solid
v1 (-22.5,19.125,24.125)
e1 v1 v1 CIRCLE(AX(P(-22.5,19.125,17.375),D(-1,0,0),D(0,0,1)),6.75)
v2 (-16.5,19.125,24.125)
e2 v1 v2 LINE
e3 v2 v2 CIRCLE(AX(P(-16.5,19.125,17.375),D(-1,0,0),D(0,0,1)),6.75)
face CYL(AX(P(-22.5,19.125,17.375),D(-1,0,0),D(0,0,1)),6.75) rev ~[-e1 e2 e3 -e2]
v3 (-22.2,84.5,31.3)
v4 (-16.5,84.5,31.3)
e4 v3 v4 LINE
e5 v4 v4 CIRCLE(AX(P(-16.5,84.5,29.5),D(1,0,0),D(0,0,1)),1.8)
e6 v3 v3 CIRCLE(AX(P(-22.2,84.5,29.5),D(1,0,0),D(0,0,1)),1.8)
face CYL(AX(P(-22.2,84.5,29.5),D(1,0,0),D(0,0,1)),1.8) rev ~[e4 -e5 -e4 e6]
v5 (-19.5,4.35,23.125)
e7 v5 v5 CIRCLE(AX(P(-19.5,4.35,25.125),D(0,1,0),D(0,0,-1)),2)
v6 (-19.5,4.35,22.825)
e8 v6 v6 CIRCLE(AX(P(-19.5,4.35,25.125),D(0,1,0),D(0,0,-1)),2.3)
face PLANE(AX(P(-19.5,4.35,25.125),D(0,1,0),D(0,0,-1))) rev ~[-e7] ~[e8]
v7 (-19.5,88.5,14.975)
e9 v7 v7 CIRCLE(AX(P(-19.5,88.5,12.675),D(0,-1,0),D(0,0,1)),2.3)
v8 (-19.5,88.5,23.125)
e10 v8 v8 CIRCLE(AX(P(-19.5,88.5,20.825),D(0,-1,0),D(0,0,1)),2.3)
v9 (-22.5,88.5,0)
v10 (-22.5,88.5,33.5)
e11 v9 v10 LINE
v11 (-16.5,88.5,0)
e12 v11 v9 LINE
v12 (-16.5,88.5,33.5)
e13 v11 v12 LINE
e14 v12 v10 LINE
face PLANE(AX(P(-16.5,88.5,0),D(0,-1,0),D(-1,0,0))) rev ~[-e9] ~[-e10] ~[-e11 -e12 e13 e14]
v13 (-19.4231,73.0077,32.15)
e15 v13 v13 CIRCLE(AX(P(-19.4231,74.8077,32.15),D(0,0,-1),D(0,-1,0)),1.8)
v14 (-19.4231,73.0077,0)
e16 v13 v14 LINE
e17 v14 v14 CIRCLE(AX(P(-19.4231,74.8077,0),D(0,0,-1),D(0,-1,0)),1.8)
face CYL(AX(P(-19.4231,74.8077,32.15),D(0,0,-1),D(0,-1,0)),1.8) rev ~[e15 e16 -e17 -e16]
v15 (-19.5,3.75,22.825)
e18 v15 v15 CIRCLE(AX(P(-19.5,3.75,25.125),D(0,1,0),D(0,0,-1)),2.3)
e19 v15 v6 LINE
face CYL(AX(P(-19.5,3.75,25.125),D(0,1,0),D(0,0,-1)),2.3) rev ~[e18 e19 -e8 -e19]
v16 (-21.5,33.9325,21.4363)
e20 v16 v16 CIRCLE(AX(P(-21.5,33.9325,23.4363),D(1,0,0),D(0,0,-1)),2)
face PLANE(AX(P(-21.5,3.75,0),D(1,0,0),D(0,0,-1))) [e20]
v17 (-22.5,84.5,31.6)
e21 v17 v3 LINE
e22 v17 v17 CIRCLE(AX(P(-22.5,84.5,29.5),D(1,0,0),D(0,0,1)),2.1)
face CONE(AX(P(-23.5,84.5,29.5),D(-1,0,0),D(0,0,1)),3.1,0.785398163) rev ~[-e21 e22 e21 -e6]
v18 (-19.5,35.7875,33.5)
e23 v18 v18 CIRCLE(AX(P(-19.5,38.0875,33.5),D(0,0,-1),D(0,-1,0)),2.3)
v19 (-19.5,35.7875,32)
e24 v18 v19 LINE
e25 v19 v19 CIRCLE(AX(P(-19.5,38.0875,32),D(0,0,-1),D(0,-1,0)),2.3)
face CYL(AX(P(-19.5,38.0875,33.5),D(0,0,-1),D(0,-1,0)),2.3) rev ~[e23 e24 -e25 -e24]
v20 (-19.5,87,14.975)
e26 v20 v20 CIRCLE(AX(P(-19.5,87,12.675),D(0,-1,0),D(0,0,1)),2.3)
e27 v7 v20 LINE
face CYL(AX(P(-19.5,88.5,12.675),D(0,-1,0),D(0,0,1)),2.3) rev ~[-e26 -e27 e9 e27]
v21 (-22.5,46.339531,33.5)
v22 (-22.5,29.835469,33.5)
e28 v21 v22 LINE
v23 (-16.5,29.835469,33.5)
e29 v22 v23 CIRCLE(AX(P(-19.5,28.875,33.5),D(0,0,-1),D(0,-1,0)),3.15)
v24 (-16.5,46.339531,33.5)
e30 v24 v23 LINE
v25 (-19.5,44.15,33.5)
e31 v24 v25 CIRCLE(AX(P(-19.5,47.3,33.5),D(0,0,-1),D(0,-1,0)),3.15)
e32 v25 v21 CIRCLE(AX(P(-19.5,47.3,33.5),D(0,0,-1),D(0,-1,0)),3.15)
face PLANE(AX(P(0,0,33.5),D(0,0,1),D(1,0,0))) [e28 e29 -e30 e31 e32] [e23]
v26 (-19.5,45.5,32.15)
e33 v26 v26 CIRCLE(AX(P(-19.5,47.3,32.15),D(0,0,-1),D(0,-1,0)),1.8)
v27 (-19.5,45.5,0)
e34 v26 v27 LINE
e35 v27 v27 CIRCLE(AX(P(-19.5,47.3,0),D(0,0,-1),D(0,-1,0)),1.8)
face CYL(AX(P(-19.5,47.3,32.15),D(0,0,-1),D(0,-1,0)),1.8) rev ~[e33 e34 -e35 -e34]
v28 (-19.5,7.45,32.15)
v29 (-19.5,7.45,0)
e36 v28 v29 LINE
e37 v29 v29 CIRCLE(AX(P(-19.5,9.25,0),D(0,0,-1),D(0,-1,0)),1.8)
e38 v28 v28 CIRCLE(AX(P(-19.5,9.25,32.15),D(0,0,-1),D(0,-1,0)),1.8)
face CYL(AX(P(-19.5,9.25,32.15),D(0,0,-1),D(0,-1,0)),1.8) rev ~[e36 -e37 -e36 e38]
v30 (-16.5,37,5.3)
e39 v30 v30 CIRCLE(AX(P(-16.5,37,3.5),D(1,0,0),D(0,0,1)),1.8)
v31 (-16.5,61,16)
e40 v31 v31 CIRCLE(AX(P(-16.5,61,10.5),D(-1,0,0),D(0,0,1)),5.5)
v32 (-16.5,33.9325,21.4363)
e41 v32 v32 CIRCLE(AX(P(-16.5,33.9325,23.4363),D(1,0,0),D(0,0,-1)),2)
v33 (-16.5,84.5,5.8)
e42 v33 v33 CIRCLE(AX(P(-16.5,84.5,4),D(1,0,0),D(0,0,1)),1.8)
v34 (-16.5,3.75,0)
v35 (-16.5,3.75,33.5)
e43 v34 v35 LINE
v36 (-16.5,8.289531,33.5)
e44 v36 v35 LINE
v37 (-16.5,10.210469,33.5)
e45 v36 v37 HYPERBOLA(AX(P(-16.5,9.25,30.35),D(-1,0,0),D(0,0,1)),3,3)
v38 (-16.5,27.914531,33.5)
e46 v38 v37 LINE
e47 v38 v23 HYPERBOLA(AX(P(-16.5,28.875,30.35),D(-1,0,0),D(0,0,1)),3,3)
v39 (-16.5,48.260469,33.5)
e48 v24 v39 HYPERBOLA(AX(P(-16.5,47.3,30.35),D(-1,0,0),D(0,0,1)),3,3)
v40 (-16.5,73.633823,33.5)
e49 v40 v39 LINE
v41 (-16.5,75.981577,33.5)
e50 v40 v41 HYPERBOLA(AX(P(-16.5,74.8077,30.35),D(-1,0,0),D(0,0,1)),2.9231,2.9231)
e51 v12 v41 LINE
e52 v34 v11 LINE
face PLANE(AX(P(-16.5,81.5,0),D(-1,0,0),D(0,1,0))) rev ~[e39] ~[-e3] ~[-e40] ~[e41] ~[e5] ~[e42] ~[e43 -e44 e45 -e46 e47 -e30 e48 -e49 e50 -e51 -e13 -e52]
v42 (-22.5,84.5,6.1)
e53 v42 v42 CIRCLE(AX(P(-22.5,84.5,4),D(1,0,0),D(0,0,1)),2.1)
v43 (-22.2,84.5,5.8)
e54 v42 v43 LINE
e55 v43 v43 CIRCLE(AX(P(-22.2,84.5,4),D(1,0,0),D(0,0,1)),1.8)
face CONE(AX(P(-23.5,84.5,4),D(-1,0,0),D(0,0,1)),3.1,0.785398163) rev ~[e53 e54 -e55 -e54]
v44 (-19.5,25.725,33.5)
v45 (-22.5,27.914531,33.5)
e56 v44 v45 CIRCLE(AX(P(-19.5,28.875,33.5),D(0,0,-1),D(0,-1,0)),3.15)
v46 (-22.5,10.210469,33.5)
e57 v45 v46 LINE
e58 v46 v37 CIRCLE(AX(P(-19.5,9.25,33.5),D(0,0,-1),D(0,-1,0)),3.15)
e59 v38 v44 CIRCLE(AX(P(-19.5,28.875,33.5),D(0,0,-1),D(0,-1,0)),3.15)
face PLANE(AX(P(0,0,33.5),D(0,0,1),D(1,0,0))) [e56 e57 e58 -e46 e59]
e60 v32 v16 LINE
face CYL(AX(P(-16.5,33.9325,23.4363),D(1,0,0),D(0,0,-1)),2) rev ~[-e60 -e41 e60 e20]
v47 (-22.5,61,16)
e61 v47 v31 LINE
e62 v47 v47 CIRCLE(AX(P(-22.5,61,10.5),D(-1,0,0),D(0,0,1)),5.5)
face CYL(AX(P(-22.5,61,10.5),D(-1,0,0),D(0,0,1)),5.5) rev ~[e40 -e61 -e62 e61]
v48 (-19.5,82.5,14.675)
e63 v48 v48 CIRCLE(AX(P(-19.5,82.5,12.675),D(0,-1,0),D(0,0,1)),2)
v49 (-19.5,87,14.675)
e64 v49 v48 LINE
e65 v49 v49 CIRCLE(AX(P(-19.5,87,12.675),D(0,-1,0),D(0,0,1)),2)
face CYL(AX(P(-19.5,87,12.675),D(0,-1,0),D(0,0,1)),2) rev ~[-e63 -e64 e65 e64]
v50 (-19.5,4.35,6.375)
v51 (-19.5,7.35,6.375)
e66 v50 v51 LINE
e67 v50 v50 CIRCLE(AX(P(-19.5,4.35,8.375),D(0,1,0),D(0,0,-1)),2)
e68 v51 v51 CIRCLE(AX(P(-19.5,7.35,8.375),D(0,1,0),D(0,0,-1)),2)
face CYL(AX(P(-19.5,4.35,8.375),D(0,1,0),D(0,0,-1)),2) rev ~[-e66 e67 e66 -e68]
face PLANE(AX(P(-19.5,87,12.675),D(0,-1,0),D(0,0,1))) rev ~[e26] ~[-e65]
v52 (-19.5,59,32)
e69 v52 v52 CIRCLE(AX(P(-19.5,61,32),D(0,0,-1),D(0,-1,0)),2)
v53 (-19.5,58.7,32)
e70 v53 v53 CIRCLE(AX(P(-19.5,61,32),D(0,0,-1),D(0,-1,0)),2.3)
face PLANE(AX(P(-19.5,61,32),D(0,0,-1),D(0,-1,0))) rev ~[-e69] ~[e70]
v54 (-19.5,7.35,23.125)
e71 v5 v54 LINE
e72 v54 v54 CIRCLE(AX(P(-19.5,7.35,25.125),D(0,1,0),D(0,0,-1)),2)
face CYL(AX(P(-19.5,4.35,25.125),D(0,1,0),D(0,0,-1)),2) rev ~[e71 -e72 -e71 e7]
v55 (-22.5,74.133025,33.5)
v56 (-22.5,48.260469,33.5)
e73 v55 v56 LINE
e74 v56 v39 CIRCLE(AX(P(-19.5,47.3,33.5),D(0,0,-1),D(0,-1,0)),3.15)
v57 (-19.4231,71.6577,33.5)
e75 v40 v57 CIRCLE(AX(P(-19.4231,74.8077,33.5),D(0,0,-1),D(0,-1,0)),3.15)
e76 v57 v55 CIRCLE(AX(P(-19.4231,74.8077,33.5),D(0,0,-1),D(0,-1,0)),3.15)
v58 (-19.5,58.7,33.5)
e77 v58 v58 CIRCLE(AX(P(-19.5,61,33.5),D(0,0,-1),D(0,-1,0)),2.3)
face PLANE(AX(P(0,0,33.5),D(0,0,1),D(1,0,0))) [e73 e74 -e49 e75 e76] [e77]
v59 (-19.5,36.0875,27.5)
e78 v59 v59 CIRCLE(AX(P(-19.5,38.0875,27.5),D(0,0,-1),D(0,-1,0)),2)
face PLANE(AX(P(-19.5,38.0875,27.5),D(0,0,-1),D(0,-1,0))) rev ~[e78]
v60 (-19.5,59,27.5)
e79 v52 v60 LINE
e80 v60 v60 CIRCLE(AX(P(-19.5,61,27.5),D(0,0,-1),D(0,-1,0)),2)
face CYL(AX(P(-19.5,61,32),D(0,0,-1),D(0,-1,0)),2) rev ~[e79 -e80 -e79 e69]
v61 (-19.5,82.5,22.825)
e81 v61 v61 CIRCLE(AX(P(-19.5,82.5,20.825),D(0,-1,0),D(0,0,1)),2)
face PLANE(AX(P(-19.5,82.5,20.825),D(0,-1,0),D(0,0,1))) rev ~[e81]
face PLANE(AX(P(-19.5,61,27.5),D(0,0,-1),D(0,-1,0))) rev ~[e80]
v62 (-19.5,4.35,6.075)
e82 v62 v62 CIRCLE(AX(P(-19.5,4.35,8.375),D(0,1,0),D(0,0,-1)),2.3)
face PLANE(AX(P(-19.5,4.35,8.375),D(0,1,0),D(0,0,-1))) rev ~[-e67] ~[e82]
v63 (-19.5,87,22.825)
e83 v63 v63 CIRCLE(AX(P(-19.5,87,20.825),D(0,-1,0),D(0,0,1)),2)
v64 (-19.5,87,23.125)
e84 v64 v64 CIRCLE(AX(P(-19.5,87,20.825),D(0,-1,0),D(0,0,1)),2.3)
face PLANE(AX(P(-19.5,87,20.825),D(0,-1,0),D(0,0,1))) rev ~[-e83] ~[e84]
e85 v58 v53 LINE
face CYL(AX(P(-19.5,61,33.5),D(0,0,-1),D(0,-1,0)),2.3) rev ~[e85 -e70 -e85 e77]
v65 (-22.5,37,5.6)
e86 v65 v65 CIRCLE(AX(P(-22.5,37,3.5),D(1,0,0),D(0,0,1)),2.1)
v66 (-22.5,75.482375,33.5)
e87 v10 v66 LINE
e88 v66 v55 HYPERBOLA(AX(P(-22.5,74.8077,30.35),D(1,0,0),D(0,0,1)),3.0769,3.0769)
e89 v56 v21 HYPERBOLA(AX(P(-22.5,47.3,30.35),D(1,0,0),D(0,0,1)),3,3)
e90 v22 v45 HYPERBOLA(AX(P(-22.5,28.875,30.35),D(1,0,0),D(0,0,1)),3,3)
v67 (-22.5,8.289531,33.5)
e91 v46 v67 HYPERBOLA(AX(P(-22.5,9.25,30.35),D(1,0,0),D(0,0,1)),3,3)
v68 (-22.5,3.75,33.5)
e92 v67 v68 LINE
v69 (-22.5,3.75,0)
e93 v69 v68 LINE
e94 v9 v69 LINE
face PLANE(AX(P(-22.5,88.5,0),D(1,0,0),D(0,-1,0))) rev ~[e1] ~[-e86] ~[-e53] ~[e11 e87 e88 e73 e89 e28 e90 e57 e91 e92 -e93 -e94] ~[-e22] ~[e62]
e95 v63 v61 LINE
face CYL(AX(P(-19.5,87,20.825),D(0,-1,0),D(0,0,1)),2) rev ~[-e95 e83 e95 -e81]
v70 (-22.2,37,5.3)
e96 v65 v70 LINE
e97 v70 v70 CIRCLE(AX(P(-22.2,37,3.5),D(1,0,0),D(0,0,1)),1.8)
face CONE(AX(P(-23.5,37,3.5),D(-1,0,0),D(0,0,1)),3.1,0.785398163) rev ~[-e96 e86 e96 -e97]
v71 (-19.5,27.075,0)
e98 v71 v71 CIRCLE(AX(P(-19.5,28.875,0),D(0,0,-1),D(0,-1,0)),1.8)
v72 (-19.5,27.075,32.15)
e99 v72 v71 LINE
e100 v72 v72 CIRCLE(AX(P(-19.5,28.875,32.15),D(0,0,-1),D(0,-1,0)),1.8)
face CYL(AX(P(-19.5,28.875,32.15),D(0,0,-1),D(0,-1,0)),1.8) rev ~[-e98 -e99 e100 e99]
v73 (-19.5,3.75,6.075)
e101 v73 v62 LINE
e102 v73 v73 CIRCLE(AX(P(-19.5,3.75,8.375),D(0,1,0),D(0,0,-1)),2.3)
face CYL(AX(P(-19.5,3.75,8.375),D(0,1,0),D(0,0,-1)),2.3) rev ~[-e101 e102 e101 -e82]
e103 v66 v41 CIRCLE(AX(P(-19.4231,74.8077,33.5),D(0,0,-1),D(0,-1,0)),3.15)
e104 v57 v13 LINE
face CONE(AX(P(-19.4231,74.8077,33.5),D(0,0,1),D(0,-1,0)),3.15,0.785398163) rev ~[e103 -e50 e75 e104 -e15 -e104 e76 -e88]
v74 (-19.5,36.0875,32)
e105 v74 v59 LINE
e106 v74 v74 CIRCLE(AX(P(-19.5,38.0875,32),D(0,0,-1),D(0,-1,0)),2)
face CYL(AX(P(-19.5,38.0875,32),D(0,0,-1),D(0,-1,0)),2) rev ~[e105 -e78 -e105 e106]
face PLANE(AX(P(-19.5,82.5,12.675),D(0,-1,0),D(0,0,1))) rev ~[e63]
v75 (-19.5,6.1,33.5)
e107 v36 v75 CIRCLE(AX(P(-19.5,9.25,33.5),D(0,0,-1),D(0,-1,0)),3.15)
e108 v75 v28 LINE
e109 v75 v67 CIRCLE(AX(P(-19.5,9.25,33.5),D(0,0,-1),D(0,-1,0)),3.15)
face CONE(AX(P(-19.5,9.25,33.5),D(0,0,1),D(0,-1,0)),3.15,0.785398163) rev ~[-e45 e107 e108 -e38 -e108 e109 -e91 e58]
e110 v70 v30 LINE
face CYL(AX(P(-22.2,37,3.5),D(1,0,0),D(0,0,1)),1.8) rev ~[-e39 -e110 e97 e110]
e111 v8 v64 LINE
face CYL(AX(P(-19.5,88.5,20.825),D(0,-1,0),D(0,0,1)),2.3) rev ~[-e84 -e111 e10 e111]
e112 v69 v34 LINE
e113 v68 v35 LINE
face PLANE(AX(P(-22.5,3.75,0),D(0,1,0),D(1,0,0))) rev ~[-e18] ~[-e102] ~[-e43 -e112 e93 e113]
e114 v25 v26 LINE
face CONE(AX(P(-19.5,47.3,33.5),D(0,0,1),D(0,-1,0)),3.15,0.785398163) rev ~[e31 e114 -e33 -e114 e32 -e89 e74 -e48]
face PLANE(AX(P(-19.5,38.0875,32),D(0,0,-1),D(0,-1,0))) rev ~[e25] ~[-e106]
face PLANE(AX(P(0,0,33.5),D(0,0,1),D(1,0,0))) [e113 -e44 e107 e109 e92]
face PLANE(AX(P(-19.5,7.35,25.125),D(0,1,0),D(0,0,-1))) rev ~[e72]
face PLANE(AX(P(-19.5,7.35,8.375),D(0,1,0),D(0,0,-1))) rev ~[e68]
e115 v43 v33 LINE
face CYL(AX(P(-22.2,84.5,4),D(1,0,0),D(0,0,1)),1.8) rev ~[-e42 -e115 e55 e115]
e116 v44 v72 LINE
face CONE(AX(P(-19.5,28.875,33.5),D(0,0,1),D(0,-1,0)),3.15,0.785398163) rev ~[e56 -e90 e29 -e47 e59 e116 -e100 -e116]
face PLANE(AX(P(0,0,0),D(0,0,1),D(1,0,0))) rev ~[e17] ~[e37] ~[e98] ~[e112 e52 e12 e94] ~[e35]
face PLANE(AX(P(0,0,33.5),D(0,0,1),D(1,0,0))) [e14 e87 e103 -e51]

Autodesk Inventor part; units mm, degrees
ref_plane "YZ Plane" through (0, 0, 0) normal (1, 0, 0) x (0, 1, 0)
ref_plane "XZ Plane" through (0, 0, 0) normal (0, 1, 0) x (-1, 0, 0)
ref_plane "Work Plane1" through (0, 0, 0) normal (0, 0, 1) x (1, 0, 0)
sketch "Sketch1" plane through (0, 0, 0) normal (0, 0, 1) x (1, 0, 0)
  line L0 (23.5, 88.5) -> (-23.5, 88.5) projected
  line L1 (-23.5, 88.5) -> (-23.5, 36.5) projected
  line L2 (-26.5, 33.5) -> (-89, 33.5) projected
  line L3 (-89, 33.5) -> (-89, -72.5) projected
  line L4 (-89, -72.5) -> (-77, -72.5) projected
  line L5 (-74, -75.5) -> (-74, -93.5) projected
  line L6 (-74, -93.5) -> (74, -93.5) projected
  line L7 (74, -93.5) -> (74, -75.5) projected
  line L8 (77, -72.5) -> (89, -72.5) projected
  line L9 (89, -72.5) -> (89, 33.5) projected
  line L10 (89, 33.5) -> (26.5, 33.5) projected
  line L11 (23.5, 36.5) -> (23.5, 88.5) projected
  line L12 (-4.5, 81.5) -> (-4.5, 36.5) projected
  line L13 (-7.5, 33.5) -> (-13.5, 33.5) projected
  line L14 (-16.5, 36.5) -> (-16.5, 81.5) projected
  line L15 (-13.5, 84.5) -> (-7.5, 84.5) projected
  line L16 (16.5, 81.5) -> (16.5, 36.5) projected
  line L17 (13.5, 33.5) -> (7.5, 33.5) projected
  line L18 (4.5, 36.5) -> (4.5, 81.5) projected
  line L19 (7.5, 84.5) -> (13.5, 84.5) projected
  line L20 (-16.5, 88.5) -> (-22.5, 88.5)
  line L21 (-22.5, 88.5) -> (-22.5, 3.75)
  line L22 (-22.5, 3.75) -> (-16.5, 3.75)
  line L23 (-16.5, 3.75) -> (-16.5, 88.5)
  line L24 (-32.2, 4.75) -> (-59.9, 4.75)
  arc A0 (13.5, 33.5) -> (16.5, 36.5) centre (13.5, 36.5) ccw projected
  arc A1 (4.5, 36.5) -> (7.5, 33.5) centre (7.5, 36.5) ccw projected
  arc A2 (7.5, 84.5) -> (4.5, 81.5) centre (7.5, 81.5) ccw projected
  arc A3 (16.5, 81.5) -> (13.5, 84.5) centre (13.5, 81.5) ccw projected
  arc A4 (-4.5, 81.5) -> (-7.5, 84.5) centre (-7.5, 81.5) ccw projected
  arc A5 (-7.5, 33.5) -> (-4.5, 36.5) centre (-7.5, 36.5) ccw projected
  arc A6 (-16.5, 36.5) -> (-13.5, 33.5) centre (-13.5, 36.5) ccw projected
  arc A7 (-13.5, 84.5) -> (-16.5, 81.5) centre (-13.5, 81.5) ccw projected
  arc A8 (-26.5, 33.5) -> (-23.5, 36.5) centre (-26.5, 36.5) ccw projected
  arc A9 (-74, -75.5) -> (-77, -72.5) centre (-77, -75.5) ccw projected
  arc A10 (77, -72.5) -> (74, -75.5) centre (77, -75.5) ccw projected
  arc A11 (23.5, 36.5) -> (26.5, 33.5) centre (26.5, 36.5) ccw projected
  point P0 (0, 0)
  point P1 (-16.5, 36.5)
  point P2 (-16.5, 81.5)
  dimension "d0" = 1
  dimension "d2" = 1
ref_plane "Work Plane2" through (-89, -40.3889, 33.5) normal (0, 0, 1) x (1, 0, 0)
extrude "Extrusion1" add sketch "Sketch1" along normal up to surface (33.5 mm away) contours L23 L14 L22 L21 L0
sketch "Sketch2" plane through (-22.5, 3.75, 0) normal (-1, 0, 0) x (0, 0, 1)
  arc A0 (15.7043, 9.7757) -> (16.863, 11.545) centre (12.3771, 13.2188) ccw projected
  arc A1 (16.863, 11.545) -> (17.4685, 11.512) centre (17.375, 15.375) ccw projected
  arc A2 (17.4685, 11.512) -> (18.4285, 9.6275) centre (22.1095, 12.6893) ccw projected
  arc A3 (18.4285, 9.6275) -> (19.3146, 9.863) centre (17.375, 15.375) ccw projected
  arc A4 (19.3146, 9.863) -> (19.2121, 11.9755) centre (14.599, 10.6929) ccw projected
  arc A5 (19.2121, 11.9755) -> (19.7212, 12.3047) centre (17.375, 15.375) ccw projected
  arc A6 (19.7212, 12.3047) -> (21.6056, 11.3444) centre (22.7839, 15.9851) ccw projected
  arc A7 (21.6056, 11.3444) -> (22.184, 12.0558) centre (17.375, 15.375) ccw projected
  arc A8 (22.184, 12.0558) -> (20.8594, 13.7045) centre (17.8813, 9.9554) ccw projected
  arc A9 (20.8594, 13.7045) -> (21.0778, 14.2702) centre (17.375, 15.375) ccw projected
  arc A10 (21.0778, 14.2702) -> (23.1668, 14.6008) centre (21.3923, 19.0479) ccw projected
  arc A11 (23.1668, 14.6008) -> (23.2166, 15.5164) centre (17.375, 15.375) ccw projected
  arc A12 (23.2166, 15.5164) -> (21.1758, 16.0716) centre (20.9701, 11.288) ccw projected
  arc A13 (21.1758, 16.0716) -> (21.02, 16.6576) centre (17.375, 15.375) ccw projected
  arc A14 (21.02, 16.6576) -> (22.5157, 18.153) centre (18.4662, 20.7077) ccw projected
  arc A15 (22.5157, 18.153) -> (22.0178, 18.923) centre (17.375, 15.375) ccw projected
  arc A16 (22.0178, 18.923) -> (20.0404, 18.1726) centre (22.6858, 14.1817) ccw projected
  arc A17 (20.0404, 18.1726) -> (19.57, 18.5552) centre (17.375, 15.375) ccw projected
  arc A18 (19.57, 18.5552) -> (19.9011, 20.644) centre (15.1233, 20.3306) ccw projected
  arc A19 (19.9011, 20.644) -> (19.0457, 20.9743) centre (17.375, 15.375) ccw projected
  arc A20 (19.0457, 20.9743) -> (17.887, 19.205) centre (22.3729, 17.5312) ccw projected
  arc A21 (17.887, 19.205) -> (17.2815, 19.238) centre (17.375, 15.375) ccw projected
  arc A22 (17.2815, 19.238) -> (16.3215, 21.1225) centre (12.6405, 18.0607) ccw projected
  arc A23 (16.3215, 21.1225) -> (15.4354, 20.887) centre (17.375, 15.375) ccw projected
  arc A24 (15.4354, 20.887) -> (15.5379, 18.7745) centre (20.151, 20.0571) ccw projected
  arc A25 (15.5379, 18.7745) -> (15.0288, 18.4453) centre (17.375, 15.375) ccw projected
  arc A26 (15.0288, 18.4453) -> (13.1444, 19.4056) centre (11.9661, 14.7649) ccw projected
  arc A27 (13.1444, 19.4056) -> (12.566, 18.6942) centre (17.375, 15.375) ccw projected
  arc A28 (12.566, 18.6942) -> (13.8906, 17.0455) centre (16.8687, 20.7946) ccw projected
  arc A29 (13.8906, 17.0455) -> (13.6722, 16.4798) centre (17.375, 15.375) ccw projected
  arc A30 (13.6722, 16.4798) -> (11.5832, 16.1492) centre (13.3577, 11.7021) ccw projected
  arc A31 (11.5832, 16.1492) -> (11.5334, 15.2336) centre (17.375, 15.375) ccw projected
  arc A32 (11.5334, 15.2336) -> (13.5742, 14.6784) centre (13.7799, 19.462) ccw projected
  arc A33 (13.5742, 14.6784) -> (13.73, 14.0924) centre (17.375, 15.375) ccw projected
  arc A34 (13.73, 14.0924) -> (12.2343, 12.597) centre (16.2838, 10.0423) ccw projected
  arc A35 (12.2343, 12.597) -> (12.7322, 11.827) centre (17.375, 15.375) ccw projected
  arc A36 (12.7322, 11.827) -> (14.7096, 12.5774) centre (12.0642, 16.5683) ccw projected
  arc A37 (14.7096, 12.5774) -> (15.18, 12.1948) centre (17.375, 15.375) ccw projected
  arc A38 (15.18, 12.1948) -> (14.8489, 10.106) centre (19.6267, 10.4194) ccw projected
  arc A39 (14.8489, 10.106) -> (15.7043, 9.7757) centre (17.375, 15.375) ccw projected
  circle A40 centre (17.375, 15.375) radius 6.75
  circle A41 centre (17.375, 15.375) radius 5.8433
  line L0 (23.2183, 15.375) -> (24.125, 15.375)
  circle A42 centre (10.5, 57.25) radius 5.5 projected
  point P0 (0, -3.75)
  dimension "d6" = 13.5
  dimension "d5" = 0.9067
  dimension "d9" = 11
extrude "Extrusion2" cut sketch "Sketch2" against normal up to next contours A39 A38 A37 A36 A35 A34 A33 A32 A31 A30 A29 A28 A27 A26 A25 A24 A23 A22 A21 A20 A19 A18 A17 A16 A15 A14 A13 A12 A11 A10 A9 A8 A7 A6 A5 A4 A3 A2 A1 A0 | A0 A1 A2 A41 | A41 A36 A37 A38 | A4 A5 A6 A41 | A41 A32 A33 A34 | A8 A9 A10 A41 | A41 A28 A29 A30 | A41 A24 A25 A26 | A12 A13 A14 A41 | A41 A20 A21 A22 | A16 A17 A18 A41 | A40 | A42
sketch "Sketch3" plane through (-16.5, 3.75, 0) normal (1, 0, 0) x (0, 0, -1)
  circle A0 centre (-23.4363, 30.1825) radius 2 projected
  point P0 (0, -3.75)
extrude "Extrusion3" cut sketch "Sketch3" against normal blind 5
ref_plane "Work Plane3" through (-23.5, 3.75, 0) normal (-1, 0, 0) x (0, 0, 1)
sketch "Sketch5" plane through (-23.5, 3.75, 0) normal (-1, 0, 0) x (0, 0, 1)
  circle A0 centre (29.5, 80.75) radius 2.1 projected
  circle A1 centre (4, 80.75) radius 2.1 projected
  circle A2 centre (3.5, 33.25) radius 2.1 projected
  point P0 (0, -3.75)
hole "Hole1" at (-23.5, 84.5, 29.5) at (-23.5, 84.5, 4) at (-23.5, 37, 3.5) direction (1, 0, 0) diameter 3.6 end through all countersink diameter 6.2 countersink angle 90 clearance for "Countersunk Flat Head Screw ISO 2009/7046" size "M3" standard "ISO"
sketch "Sketch6" plane through (-22.5, 3.75, 33.5) normal (0, 0, 1) x (1, 0, 0)
  line L0 (0, 8.625) -> (0, 22.125) projected
  line L1 (1, 32.1825) -> (1, 28.1825) projected
  line L2 (0, 31.15) -> (0, 35.35) projected
  line L3 (0, 51.75) -> (0, 62.75) projected
  line L4 (0, 78.65) -> (0, 82.85) projected
  line L5 (0, 78.65) -> (0, 82.85) projected
  line L6 (6, 0) -> (0, 0) projected
  line L7 (6, 84.75) -> (6, 0) projected
  line L8 (0, 84.75) -> (6, 84.75) projected
  line L9 (0, 0) -> (0, 84.75) projected
  line L10 (6, 28.125) -> (0, 28.125)
  line L11 (0, 28.125) -> (0, 35.35)
  line L12 (0, 35.35) -> (6, 35.35)
  line L13 (6, 35.35) -> (6, 28.125)
  line L14 (0, 8.625) -> (6, 8.625) projected
  line L15 (6, 8.625) -> (0, 8.625)
  line L16 (0, 8.625) -> (0, 22.125)
  line L17 (0, 22.125) -> (6, 22.125)
  line L18 (6, 22.125) -> (6, 8.625)
  line L19 (6, 78.95) -> (0.3, 78.95) projected
  line L20 (6, 84.75) -> (0, 84.75) projected
  line L21 (6, 78.95) -> (0, 78.95)
  line L22 (0, 78.95) -> (0, 84.75)
  line L23 (0, 84.75) -> (6, 84.75)
  line L24 (6, 84.75) -> (6, 78.95)
  line L25 (0, 51.75) -> (6, 51.75) projected
  line L26 (0, 51.75) -> (0, 62.75) projected
  line L27 (6, 51.75) -> (0, 51.75)
  line L28 (0, 51.75) -> (0, 62.75)
  line L29 (0, 62.75) -> (6, 62.75)
  line L30 (6, 62.75) -> (6, 51.75)
  line L31 (6, 0) -> (0, 0)
  line L32 (0, 0) -> (0, 3.7)
  line L33 (0, 3.7) -> (6, 3.7)
  line L34 (6, 3.7) -> (6, 0)
  circle A0 centre (3, 5.5) radius 1.8
  line L35 (6, 22.125) -> (0, 28.125)
  line L36 (0, 22.125) -> (6, 28.125)
  line L37 (6, 35.35) -> (0, 51.75)
  line L38 (0, 35.35) -> (6, 51.75)
  line L39 (0.3, 82.55) -> (0.3, 78.95) projected
  line L40 (6, 62.75) -> (0.3, 78.95)
  line L41 (6, 82.55) -> (6, 78.95) projected
  line L42 (0.3, 78.95) -> (6, 78.95)
  line L43 (6, 78.95) -> (0, 62.75)
  point P0 (22.5, -3.75)
  point P1 (3, 25.125)
  point P2 (3.0769, 71.0577)
  point P3 (3, 43.55)
  dimension "d20" = 3.7
  dimension "d21" = 3.6
  dimension "d22" = 3
  dimension "d23" = 3
hole "Hole2" at (-19.5, 28.875, 33.5) at (-19.5, 9.25, 33.5) at (-19.4231, 74.8077, 33.5) at (-19.5, 47.3, 33.5) direction (0, 0, -1) diameter 3.6 end through all countersink diameter 6.3 countersink angle 90 clearance for "Countersunk Flat Head Screw ISO 2009/7046" size "M3" standard "ISO"
sketch "Sketch7" plane through (-22.5, 3.75, 0) normal (0, -1, 0) x (1, 0, 0)
  line L0 (6, 33.5) -> (0, 33.5) projected
  line L1 (0, 0) -> (0, 33.5) projected
  line L2 (0, 0) -> (6, 0) projected
  line L3 (6, 0) -> (6, 33.5) projected
  line L4 (0, 0) -> (0, 33.5) projected
  line L5 (0, 16.75) -> (6, 16.75)
  line L6 (6, 16.75) -> (0, 33.5)
  line L7 (6, 16.75) -> (0, 0)
  line L8 (6, 0) -> (0, 0) projected
  line L9 (6, 0) -> (0, 16.75)
  line L10 (0, 33.5) -> (6, 33.5) projected
  line L11 (6, 33.5) -> (0, 16.75)
  point P0 (22.5, 0)
  point P1 (3, 25.125)
  point P2 (3, 8.375)
hole "Hole3" at (-19.5, 3.75, 25.125) at (-19.5, 3.75, 8.375) direction (0, 1, 0) diameter 4 depth 3.6 counterbore diameter 4.6 counterbore depth 0.6
sketch "Sketch9" plane through (-22.5, 88.5, 0) normal (0, 1, 0) x (1, 0, 0)
  circle A0 centre (22.5, -20.825) radius 2.3 projected
  circle A1 centre (22.5, -12.675) radius 2.3 projected
  line L0 (18, -33.5) -> (27, -33.5) projected
  line L1 (27, 0) -> (27, -33.5) projected
  line L2 (27, 0) -> (18, 0) projected
  line L3 (18, 0) -> (18, -33.5) projected
  line L4 (22.5, -20.825) -> (0, -20.825)
  line L5 (0, -24.125) -> (0, -10.625) projected
  line L6 (22.5, -12.675) -> (0, -12.675)
  line L7 (6, 0) -> (6, -33.5) projected
  point P0 (22.5, 0)
  point P1 (3, -20.825)
  point P2 (3, -12.675)
  dimension "d45" = 3
  dimension "d46" = 3
  dimension "d47" = 3
  dimension "d48" = 3
hole "Hole5" at (-19.5, 88.5, 20.825) at (-19.5, 88.5, 12.675) direction (0, -1, 0) diameter 4 depth 6 counterbore diameter 4.6 counterbore depth 1.5
sketch "Sketch10" plane through (-19.5, 47.3, 33.5) normal (0, 0, 1) x (1, 0, 0)
  line L0 (-3, 8.2) -> (-3, 19.2) projected
  arc A0 (3, -17.4645) -> (-3, -17.4645) centre (0, -18.425) ccw projected
  arc A1 (-3, -0.9605) -> (3, -0.9605) centre (0, 0) ccw projected
  arc A2 (3, -17.4645) -> (-3, -17.4645) centre (0, -18.425) ccw projected
  line L1 (3, -0.9605) -> (3, -17.4645) projected
  arc A3 (-3, -0.9605) -> (3, -0.9605) centre (0, 0) ccw projected
  line L2 (-3, -17.4645) -> (-3, -0.9605) projected
  line L3 (3, 8.2) -> (-3, 8.2)
  line L4 (3, 19.2) -> (-3, 19.2)
  line L5 (-3, 19.2) -> (3, 8.2)
  line L6 (-3, 8.2) -> (3, 19.2)
  line L7 (3, -17.4645) -> (-3, -0.9605)
  line L8 (-3, -17.4645) -> (3, -0.9605)
  point P0 (19.5, -47.3)
  point P1 (0, -9.2125)
  point P2 (0, 13.7)
hole "Hole6" at (-19.5, 38.0875, 33.5) at (-19.5, 61, 33.5) direction (0, 0, -1) diameter 4 depth 6 counterbore diameter 4.6 counterbore depth 1.5
equation "\"d22\" = d23"
equation "\"d45\" = d46"
equation "\"d47\" = d48"
properties part number "right_gear_holder"
